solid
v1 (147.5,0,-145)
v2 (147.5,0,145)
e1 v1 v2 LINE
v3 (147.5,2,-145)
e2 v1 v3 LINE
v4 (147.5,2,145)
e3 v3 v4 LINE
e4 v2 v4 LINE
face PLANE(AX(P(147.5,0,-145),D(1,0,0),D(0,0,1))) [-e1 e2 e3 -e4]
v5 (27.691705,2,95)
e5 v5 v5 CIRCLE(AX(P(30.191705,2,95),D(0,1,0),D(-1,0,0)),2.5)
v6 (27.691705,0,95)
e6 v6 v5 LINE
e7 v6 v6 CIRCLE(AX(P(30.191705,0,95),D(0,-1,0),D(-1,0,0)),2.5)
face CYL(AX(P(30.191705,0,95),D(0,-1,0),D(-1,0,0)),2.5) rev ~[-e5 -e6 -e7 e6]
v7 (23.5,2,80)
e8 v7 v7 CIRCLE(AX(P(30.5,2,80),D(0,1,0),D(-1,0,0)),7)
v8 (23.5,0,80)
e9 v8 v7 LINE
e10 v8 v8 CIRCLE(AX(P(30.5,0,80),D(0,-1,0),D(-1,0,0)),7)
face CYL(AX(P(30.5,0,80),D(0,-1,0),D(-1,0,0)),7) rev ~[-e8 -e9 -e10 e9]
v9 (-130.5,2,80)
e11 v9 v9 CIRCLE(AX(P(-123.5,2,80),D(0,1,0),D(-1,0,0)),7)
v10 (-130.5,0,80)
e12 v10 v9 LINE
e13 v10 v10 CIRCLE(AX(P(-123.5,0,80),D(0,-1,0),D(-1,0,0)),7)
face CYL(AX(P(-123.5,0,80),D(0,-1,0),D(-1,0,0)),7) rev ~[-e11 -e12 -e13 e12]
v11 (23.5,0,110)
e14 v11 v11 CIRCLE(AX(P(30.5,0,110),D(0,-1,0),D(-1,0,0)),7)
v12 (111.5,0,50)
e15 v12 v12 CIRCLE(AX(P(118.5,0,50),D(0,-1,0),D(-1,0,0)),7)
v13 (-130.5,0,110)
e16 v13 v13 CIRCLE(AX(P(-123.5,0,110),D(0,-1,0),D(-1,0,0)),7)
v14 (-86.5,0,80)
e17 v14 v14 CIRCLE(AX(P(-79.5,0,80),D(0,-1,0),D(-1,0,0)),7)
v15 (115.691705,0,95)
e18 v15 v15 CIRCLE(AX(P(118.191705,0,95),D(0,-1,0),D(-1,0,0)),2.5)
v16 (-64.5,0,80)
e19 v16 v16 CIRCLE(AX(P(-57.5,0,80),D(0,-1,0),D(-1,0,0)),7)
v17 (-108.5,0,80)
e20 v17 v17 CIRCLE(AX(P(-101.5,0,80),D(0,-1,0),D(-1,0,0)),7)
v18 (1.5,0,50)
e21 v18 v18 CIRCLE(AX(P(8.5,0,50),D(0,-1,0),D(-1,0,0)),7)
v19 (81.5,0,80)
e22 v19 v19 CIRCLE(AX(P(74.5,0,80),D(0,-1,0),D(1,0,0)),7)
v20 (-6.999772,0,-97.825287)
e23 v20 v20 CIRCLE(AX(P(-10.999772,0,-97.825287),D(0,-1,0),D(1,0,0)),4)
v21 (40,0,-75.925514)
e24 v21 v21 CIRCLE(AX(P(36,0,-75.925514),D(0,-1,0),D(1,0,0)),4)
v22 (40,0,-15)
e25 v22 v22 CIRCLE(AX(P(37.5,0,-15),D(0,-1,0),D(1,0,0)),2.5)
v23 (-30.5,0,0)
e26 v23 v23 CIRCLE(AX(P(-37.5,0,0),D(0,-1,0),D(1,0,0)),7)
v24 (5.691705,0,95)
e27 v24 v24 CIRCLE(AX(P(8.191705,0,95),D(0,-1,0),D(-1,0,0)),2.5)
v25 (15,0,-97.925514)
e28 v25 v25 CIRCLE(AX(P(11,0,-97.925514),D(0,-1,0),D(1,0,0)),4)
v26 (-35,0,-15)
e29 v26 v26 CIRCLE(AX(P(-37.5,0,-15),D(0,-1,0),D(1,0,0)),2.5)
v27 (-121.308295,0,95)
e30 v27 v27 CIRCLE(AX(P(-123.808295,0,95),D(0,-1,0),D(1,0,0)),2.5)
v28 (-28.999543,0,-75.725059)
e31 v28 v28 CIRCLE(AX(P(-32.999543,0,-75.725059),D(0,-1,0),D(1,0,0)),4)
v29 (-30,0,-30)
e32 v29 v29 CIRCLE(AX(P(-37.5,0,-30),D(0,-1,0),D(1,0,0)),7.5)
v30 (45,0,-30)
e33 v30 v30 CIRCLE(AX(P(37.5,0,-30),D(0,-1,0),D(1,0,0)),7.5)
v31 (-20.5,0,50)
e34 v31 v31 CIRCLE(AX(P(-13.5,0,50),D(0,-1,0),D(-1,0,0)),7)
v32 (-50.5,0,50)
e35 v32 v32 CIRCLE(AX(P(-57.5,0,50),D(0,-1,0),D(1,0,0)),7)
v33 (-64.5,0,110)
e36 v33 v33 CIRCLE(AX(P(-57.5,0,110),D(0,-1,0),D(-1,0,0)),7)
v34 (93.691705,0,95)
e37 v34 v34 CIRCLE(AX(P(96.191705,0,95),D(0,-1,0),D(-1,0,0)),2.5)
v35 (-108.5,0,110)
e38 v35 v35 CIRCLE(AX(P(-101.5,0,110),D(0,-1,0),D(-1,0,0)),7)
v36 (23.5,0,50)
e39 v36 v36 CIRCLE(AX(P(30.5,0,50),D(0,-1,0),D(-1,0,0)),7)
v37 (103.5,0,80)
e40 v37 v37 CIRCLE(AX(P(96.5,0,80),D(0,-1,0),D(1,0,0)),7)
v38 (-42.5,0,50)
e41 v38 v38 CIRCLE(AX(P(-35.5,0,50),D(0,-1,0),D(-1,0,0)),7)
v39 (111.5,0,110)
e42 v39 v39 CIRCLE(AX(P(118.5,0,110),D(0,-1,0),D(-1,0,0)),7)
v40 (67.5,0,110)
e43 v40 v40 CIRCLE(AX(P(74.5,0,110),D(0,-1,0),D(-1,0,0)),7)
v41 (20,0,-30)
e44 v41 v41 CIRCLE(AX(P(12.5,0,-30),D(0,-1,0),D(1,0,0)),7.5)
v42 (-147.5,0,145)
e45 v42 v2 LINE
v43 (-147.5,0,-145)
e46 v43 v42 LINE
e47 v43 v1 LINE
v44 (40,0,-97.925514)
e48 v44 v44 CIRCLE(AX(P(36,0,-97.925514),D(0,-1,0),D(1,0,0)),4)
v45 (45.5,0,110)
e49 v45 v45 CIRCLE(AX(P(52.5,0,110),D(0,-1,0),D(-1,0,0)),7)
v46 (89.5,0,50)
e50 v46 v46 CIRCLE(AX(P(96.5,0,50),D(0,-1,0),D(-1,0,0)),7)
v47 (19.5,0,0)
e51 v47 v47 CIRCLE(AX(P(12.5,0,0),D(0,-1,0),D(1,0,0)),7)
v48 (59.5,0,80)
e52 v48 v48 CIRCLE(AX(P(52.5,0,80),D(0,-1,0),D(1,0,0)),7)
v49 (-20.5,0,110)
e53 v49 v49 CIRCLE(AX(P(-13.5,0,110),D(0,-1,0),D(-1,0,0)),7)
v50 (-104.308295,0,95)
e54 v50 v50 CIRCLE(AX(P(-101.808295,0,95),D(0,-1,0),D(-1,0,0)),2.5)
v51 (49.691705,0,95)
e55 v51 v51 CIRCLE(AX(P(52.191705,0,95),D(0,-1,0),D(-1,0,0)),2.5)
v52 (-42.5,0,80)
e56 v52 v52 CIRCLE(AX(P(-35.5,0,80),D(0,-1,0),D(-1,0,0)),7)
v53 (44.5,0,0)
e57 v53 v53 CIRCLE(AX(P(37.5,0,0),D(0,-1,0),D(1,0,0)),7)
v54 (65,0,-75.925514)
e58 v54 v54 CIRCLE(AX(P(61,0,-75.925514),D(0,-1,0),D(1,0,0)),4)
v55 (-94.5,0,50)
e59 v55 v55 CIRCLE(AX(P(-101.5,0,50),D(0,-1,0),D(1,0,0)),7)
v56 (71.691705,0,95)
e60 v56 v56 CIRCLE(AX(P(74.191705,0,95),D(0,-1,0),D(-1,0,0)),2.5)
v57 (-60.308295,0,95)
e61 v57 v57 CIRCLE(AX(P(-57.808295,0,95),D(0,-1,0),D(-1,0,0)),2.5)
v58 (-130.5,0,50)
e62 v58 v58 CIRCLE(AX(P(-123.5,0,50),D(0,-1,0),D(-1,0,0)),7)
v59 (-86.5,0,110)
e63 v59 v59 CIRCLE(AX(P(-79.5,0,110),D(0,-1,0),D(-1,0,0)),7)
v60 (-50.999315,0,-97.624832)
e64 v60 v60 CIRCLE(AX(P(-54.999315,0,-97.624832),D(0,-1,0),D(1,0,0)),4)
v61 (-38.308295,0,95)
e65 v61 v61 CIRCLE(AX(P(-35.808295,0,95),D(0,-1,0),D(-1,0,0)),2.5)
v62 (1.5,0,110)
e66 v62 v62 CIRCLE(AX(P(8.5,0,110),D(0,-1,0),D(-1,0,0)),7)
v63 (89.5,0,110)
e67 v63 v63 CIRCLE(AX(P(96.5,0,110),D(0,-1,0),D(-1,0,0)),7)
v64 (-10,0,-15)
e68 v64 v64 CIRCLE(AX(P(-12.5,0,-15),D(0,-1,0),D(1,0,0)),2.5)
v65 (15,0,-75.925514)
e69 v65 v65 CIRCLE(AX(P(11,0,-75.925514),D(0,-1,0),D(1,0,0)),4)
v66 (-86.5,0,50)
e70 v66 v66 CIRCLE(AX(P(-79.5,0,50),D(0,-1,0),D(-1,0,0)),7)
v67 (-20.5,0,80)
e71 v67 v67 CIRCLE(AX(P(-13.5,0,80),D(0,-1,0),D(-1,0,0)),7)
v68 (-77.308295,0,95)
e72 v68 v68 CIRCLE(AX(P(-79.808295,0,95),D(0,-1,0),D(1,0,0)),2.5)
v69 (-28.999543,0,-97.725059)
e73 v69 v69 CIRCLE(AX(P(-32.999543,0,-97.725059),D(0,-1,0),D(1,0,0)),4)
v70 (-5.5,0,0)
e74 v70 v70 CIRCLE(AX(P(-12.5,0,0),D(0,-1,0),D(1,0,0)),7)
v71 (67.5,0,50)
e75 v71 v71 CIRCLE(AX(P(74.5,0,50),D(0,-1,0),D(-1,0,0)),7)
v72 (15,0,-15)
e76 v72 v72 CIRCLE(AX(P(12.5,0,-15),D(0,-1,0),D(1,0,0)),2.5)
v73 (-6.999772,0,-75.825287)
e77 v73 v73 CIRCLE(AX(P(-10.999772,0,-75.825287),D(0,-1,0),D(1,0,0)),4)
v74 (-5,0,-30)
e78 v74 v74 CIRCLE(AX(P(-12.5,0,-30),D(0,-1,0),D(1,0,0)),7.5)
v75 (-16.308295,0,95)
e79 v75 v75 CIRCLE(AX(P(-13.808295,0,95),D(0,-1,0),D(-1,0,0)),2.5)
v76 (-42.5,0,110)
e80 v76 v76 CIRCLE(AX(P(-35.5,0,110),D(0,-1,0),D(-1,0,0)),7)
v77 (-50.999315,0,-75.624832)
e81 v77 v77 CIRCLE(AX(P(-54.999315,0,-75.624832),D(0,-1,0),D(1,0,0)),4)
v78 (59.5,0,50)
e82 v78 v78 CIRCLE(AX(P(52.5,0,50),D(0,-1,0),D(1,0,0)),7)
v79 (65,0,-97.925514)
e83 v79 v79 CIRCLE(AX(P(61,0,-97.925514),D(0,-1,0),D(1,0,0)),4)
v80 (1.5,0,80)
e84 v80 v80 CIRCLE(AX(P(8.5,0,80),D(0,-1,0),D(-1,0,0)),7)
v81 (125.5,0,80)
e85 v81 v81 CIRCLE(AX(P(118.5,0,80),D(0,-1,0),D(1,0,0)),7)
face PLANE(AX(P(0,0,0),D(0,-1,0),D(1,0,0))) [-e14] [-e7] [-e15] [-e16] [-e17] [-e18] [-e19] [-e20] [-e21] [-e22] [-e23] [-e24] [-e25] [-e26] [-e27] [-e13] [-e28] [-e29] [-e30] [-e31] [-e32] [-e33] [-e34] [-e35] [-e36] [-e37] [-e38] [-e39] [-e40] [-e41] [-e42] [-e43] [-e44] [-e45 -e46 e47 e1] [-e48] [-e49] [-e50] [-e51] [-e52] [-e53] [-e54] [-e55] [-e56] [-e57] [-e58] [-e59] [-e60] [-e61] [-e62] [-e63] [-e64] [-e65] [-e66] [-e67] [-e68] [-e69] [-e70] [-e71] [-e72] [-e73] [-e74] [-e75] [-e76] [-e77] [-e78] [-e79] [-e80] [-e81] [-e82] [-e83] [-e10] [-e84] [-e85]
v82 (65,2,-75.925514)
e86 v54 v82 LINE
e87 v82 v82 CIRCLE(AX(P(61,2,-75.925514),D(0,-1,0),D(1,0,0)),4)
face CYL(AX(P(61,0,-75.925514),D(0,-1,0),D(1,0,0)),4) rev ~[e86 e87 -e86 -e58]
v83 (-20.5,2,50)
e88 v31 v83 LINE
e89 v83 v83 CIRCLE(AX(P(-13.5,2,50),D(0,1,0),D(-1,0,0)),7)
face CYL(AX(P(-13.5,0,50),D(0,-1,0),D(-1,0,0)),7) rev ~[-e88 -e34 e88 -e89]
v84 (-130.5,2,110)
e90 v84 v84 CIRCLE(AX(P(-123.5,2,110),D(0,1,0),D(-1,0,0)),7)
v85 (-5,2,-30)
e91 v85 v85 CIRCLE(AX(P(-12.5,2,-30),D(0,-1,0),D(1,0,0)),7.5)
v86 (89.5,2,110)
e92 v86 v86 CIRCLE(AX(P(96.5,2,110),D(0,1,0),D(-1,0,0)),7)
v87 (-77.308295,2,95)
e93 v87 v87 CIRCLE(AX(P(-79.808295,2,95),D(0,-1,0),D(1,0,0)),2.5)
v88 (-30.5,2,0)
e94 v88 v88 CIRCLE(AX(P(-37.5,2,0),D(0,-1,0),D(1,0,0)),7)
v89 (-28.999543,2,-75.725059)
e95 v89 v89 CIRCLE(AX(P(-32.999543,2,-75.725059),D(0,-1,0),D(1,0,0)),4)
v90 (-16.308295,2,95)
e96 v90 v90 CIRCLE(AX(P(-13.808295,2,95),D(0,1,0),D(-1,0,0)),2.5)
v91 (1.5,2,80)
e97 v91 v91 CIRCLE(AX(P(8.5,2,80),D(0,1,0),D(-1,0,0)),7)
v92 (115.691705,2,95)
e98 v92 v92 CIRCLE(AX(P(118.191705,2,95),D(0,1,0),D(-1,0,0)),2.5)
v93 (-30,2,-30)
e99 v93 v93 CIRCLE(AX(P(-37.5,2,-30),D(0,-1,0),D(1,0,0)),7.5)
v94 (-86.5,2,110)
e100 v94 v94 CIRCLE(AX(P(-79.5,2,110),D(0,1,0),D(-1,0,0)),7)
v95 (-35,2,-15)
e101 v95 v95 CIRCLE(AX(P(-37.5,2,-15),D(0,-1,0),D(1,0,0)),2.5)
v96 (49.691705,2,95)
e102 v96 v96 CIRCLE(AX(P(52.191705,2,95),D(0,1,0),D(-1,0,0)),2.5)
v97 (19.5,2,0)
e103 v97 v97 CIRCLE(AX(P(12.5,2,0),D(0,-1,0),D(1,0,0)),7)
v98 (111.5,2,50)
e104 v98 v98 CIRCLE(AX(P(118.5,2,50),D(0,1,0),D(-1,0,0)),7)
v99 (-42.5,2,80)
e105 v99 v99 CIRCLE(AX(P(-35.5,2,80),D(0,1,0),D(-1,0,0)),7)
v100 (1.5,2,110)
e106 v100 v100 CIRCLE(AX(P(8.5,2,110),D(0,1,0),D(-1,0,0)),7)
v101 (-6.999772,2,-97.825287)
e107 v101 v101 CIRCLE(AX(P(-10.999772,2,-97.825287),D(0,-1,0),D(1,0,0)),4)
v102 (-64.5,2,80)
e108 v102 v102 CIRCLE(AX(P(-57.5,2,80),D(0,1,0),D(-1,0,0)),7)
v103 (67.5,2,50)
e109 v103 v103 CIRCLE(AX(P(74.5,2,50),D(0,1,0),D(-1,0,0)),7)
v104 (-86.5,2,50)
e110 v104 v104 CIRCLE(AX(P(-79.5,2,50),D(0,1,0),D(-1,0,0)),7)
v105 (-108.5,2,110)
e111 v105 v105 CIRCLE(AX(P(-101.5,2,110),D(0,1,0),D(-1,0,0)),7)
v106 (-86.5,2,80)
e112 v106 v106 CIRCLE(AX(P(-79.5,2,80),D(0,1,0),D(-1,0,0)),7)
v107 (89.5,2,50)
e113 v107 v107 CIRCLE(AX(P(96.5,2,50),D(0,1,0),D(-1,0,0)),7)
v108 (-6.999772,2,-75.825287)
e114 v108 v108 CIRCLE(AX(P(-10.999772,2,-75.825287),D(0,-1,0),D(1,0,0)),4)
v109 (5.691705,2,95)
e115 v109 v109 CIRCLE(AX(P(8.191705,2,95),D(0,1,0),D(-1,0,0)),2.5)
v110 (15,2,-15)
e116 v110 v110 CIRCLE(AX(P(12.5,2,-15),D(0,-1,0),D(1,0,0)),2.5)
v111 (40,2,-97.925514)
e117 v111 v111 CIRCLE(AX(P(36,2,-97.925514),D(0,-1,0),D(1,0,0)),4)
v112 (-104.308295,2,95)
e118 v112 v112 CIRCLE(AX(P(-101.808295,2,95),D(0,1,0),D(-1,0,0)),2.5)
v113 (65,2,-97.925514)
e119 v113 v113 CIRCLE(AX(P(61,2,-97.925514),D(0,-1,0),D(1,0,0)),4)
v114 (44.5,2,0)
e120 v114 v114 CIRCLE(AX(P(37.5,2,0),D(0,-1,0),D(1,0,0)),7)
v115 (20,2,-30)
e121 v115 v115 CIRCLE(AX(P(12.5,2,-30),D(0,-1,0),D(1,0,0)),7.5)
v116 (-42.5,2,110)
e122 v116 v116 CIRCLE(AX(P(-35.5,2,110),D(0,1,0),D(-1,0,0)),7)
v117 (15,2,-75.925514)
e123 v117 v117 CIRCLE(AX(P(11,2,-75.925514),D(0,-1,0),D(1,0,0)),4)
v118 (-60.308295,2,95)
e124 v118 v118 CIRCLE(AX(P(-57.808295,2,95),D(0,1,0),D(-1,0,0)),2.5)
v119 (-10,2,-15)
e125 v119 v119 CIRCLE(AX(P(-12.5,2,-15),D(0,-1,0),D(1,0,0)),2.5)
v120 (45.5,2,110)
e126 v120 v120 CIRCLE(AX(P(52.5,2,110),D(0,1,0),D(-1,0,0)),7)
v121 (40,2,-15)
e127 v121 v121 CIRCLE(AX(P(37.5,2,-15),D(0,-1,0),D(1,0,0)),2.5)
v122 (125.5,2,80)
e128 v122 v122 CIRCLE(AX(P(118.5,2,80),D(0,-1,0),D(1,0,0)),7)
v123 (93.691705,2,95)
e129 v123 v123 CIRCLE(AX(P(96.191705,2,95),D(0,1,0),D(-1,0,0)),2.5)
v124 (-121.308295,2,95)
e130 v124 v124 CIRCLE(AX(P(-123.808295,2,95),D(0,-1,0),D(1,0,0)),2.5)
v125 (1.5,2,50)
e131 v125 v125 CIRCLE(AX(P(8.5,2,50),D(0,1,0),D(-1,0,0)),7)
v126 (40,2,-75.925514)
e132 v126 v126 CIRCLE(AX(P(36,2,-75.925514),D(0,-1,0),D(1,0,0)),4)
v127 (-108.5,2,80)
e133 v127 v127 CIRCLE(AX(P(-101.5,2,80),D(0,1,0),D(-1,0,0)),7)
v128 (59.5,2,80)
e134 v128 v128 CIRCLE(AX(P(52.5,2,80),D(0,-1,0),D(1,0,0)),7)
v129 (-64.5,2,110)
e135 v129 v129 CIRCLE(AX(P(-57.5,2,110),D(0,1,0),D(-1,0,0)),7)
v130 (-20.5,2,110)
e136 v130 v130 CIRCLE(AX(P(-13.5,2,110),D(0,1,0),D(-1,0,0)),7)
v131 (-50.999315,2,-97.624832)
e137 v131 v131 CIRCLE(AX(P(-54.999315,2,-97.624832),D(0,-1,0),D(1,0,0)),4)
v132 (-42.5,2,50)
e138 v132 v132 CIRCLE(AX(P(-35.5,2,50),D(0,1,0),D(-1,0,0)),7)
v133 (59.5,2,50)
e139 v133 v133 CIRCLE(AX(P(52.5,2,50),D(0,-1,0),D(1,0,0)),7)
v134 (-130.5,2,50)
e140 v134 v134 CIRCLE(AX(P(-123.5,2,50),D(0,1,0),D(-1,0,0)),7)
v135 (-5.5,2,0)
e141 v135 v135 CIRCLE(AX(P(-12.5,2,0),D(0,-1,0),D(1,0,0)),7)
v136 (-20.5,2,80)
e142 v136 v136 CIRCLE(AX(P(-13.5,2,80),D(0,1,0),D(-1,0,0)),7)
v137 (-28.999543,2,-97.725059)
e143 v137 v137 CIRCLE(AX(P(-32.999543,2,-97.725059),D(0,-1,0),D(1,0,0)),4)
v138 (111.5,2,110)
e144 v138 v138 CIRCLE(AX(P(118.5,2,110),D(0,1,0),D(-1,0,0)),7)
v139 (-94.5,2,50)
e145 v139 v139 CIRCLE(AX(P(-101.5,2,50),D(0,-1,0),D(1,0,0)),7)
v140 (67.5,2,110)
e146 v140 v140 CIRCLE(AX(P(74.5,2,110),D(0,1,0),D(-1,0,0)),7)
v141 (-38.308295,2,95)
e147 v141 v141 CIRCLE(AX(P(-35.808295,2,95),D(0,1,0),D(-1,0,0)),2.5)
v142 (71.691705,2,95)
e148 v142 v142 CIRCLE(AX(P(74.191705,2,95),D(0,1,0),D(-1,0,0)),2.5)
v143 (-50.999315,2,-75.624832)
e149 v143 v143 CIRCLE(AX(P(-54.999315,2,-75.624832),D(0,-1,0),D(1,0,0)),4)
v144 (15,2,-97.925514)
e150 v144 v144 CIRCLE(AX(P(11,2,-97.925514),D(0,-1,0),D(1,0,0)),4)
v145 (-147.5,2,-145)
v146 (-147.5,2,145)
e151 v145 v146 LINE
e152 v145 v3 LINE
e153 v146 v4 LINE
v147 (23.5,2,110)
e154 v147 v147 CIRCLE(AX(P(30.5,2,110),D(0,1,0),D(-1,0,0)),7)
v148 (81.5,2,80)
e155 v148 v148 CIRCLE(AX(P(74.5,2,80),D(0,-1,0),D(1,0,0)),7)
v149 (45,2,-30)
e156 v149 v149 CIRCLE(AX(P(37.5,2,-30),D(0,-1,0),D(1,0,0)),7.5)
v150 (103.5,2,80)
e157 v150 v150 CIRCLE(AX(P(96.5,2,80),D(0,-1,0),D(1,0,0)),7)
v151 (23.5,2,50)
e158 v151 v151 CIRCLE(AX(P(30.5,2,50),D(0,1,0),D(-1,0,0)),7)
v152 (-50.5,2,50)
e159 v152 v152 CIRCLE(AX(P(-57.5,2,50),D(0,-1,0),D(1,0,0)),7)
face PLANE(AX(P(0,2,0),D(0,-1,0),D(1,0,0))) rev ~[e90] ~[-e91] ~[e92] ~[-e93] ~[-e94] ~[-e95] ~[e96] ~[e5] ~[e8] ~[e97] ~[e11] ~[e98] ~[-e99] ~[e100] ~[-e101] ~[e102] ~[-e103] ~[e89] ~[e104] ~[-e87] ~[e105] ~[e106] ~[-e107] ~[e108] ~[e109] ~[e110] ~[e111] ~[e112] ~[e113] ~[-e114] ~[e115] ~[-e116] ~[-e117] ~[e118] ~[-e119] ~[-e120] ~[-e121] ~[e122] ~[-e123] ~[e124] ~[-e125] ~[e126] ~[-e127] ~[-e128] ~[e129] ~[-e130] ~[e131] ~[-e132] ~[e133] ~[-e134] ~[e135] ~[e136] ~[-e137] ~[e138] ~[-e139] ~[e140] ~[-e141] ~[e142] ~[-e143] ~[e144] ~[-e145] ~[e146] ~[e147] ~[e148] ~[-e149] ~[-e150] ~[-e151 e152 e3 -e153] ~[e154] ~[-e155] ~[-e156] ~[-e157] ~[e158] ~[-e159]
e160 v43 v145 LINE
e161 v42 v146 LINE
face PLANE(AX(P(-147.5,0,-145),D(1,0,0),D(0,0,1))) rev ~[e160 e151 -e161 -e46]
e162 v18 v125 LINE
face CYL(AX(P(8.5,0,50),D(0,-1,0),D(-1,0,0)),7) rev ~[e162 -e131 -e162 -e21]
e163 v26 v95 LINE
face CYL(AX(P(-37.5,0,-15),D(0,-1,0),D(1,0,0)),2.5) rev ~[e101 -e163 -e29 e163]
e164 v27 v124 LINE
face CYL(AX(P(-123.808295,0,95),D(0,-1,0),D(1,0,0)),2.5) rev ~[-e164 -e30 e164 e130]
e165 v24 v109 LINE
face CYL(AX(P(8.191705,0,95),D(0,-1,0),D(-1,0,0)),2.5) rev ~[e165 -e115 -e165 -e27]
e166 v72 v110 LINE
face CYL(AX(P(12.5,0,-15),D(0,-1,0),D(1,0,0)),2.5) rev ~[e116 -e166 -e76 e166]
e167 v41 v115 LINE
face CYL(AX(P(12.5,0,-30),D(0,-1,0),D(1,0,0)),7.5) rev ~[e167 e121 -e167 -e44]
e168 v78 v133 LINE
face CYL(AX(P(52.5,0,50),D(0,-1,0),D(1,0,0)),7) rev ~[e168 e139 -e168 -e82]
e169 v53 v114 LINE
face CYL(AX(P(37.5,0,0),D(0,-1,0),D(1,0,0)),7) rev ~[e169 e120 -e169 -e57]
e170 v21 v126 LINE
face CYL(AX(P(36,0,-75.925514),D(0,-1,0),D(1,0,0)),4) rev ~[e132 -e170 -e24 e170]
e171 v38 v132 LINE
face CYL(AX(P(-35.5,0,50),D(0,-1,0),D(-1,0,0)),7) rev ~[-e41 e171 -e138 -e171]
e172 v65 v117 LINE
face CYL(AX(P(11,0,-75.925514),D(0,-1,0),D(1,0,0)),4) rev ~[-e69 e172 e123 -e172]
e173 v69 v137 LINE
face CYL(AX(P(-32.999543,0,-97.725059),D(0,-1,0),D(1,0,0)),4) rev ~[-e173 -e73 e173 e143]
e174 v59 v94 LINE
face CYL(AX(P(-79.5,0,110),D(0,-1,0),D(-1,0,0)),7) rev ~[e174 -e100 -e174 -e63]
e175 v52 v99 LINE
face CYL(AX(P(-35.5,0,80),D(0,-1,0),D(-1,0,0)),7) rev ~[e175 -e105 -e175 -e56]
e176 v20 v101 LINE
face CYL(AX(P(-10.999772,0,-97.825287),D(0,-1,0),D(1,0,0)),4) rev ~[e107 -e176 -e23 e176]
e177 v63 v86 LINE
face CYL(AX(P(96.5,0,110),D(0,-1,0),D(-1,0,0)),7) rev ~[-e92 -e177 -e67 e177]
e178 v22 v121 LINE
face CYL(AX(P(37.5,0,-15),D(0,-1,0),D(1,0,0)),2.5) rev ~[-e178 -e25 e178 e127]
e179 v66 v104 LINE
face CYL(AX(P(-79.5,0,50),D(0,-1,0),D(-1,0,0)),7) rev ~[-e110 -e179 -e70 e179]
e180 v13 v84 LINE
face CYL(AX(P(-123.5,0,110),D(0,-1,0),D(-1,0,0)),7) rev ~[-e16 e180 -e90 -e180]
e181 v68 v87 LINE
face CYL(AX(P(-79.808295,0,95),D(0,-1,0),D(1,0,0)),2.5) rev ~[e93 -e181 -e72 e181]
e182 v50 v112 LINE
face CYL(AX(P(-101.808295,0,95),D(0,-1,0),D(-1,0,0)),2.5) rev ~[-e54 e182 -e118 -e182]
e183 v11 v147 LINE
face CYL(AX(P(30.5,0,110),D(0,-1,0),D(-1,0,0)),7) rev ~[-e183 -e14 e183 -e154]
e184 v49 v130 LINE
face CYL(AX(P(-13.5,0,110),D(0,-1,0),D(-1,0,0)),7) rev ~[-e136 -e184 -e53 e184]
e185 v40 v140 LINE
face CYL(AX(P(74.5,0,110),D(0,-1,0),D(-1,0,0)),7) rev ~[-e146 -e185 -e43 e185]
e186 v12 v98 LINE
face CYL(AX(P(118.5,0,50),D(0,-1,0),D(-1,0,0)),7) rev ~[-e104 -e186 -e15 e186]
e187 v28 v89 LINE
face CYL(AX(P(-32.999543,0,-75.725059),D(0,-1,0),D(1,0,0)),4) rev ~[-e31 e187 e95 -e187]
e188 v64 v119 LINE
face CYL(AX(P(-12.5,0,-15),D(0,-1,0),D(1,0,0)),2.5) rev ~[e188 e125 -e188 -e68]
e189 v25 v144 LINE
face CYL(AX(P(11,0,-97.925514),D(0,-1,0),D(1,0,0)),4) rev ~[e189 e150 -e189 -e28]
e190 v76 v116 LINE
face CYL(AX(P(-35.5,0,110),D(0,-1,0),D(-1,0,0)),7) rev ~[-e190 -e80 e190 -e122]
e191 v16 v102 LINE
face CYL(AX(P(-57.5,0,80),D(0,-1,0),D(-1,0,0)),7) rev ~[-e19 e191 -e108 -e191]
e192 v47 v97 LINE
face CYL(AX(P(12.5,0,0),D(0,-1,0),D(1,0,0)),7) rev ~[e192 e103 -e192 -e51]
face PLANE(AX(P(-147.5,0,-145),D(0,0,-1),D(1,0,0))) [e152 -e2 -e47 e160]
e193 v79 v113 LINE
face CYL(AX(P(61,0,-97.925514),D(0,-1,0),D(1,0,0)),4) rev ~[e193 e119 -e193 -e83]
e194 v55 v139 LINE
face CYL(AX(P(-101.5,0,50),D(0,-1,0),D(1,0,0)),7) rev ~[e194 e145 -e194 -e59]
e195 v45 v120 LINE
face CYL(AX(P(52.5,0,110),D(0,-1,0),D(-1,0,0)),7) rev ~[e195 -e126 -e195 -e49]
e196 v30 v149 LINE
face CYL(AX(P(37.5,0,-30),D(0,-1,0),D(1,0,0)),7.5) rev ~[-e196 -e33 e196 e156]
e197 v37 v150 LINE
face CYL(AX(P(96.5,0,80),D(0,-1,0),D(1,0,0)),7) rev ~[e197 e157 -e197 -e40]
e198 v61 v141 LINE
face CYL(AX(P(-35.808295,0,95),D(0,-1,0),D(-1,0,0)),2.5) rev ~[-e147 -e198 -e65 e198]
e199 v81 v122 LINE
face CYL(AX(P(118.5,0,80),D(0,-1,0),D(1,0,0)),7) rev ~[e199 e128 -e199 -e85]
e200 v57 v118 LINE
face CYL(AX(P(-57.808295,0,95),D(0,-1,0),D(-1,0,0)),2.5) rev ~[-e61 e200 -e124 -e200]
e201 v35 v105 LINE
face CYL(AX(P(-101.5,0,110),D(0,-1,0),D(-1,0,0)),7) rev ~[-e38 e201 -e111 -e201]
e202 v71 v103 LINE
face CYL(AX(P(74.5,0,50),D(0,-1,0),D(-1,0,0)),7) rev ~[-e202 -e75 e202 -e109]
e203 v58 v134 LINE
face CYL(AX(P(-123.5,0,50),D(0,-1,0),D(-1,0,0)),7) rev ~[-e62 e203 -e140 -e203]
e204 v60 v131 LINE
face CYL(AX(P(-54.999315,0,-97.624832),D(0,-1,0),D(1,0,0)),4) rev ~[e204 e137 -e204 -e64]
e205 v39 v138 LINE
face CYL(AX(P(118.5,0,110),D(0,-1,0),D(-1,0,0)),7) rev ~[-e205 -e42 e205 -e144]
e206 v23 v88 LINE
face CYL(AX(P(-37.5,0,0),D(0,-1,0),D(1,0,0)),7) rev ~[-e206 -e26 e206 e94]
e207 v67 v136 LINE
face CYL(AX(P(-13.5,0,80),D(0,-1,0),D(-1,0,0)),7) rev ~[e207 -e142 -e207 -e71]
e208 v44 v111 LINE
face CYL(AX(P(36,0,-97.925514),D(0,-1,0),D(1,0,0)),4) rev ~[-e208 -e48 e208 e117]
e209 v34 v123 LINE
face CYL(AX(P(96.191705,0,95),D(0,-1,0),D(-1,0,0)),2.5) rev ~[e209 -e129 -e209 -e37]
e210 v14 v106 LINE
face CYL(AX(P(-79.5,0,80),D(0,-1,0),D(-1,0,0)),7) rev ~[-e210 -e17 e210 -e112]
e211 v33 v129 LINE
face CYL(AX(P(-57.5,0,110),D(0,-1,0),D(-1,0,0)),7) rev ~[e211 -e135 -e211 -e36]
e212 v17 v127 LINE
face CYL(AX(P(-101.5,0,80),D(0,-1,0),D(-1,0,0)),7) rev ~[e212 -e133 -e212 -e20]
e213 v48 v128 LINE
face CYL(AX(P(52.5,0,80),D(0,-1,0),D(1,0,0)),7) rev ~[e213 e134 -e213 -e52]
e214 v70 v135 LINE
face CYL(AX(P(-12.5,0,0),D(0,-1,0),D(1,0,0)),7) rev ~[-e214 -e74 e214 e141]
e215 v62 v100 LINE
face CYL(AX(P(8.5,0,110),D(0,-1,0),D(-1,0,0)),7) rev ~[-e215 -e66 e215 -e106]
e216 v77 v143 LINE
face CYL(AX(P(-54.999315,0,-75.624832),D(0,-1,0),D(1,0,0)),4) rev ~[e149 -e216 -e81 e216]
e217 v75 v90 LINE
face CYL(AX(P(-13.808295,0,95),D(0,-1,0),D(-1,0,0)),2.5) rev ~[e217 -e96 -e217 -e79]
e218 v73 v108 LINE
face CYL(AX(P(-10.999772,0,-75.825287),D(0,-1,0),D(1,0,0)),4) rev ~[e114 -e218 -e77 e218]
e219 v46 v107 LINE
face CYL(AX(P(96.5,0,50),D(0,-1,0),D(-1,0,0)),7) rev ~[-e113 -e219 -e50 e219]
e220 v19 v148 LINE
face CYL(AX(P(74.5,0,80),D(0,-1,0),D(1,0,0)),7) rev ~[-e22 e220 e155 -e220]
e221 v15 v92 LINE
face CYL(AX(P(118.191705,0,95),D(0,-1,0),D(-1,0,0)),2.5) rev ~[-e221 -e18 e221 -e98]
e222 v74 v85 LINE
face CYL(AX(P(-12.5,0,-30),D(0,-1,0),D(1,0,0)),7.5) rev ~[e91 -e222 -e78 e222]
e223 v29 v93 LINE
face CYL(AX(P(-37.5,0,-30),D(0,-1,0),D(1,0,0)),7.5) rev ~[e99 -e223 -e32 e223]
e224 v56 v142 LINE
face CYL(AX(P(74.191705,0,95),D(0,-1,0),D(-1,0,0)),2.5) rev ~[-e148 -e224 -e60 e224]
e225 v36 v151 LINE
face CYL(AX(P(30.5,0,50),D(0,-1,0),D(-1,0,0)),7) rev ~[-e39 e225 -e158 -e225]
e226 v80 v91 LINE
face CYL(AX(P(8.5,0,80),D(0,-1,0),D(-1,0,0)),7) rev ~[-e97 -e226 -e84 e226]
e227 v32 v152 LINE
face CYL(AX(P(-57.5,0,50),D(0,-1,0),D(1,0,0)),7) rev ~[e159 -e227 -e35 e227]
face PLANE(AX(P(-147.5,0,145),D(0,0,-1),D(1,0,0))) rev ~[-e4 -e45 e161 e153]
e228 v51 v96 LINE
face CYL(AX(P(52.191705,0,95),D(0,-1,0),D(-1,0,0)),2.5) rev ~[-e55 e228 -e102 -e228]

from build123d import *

# Parameters (mm, degrees)
F0_W      = 295
F0_H      = 290
F1_DEPTH  = 2
F3_DEPTH  = 25
F4_DEPTH  = 25
F6_DEPTH  = 25
F8_DEPTH  = 25
F9_R      = 7.5
F9_R_2    = 7
F9_R_3    = 2.5
F10_DEPTH = 25
F11_W     = 295
F11_H     = 290
F11_R     = 4
F11_R_2   = 7.5
F11_R_3   = 2.5
F11_R_4   = 7
F12_DEPTH = 2


# Not quite as in the source:
# - a feature names something its author has since deleted; it is built from what else it names


with BuildPart() as f1:
    # F0 (on Front) → F1 (new body)
    with BuildSketch(Plane.XZ):
        Rectangle(F0_W, F0_H)
    extrude(amount=-F1_DEPTH)

    # F2 (on face) → F3 (cut)
    with BuildSketch(Plane.XZ):
        with BuildLine():
            ThreePointArc((-116.5, 110), (-123.5, 117), (-130.5, 110))
            Line((-130.5, 110), (-116.5, 110))
        make_face()
        with BuildLine():
            Line((-116.5, 110), (-130.5, 110))
            ThreePointArc((-130.5, 110), (-123.5, 103), (-116.5, 110))
        make_face()
    extrude(amount=-F3_DEPTH, mode=Mode.SUBTRACT)

    # F2 (on face) → F4 (cut)
    with BuildSketch(Plane.XZ):
        with BuildLine():
            ThreePointArc((-116.5, 110), (-123.5, 117), (-130.5, 110))
            Line((-130.5, 110), (-116.5, 110))
        make_face()
        with BuildLine():
            ThreePointArc((125.5, 110), (118.5, 117), (111.5, 110))
            Line((111.5, 110), (125.5, 110))
        make_face()
        with BuildLine():
            Line((125.5, 110), (111.5, 110))
            ThreePointArc((111.5, 110), (118.5, 103), (125.5, 110))
        make_face()
        with BuildLine():
            ThreePointArc((103.5, 110), (96.5, 117), (89.5, 110))
            Line((89.5, 110), (103.5, 110))
        make_face()
        with BuildLine():
            Line((103.5, 110), (89.5, 110))
            ThreePointArc((89.5, 110), (96.5, 103), (103.5, 110))
        make_face()
        with BuildLine():
            ThreePointArc((81.5, 110), (74.5, 117), (67.5, 110))
            Line((67.5, 110), (81.5, 110))
        make_face()
        with BuildLine():
            Line((81.5, 110), (67.5, 110))
            ThreePointArc((67.5, 110), (74.5, 103), (81.5, 110))
        make_face()
        with BuildLine():
            ThreePointArc((59.5, 110), (52.5, 117), (45.5, 110))
            Line((45.5, 110), (59.5, 110))
        make_face()
        with BuildLine():
            Line((59.5, 110), (45.5, 110))
            ThreePointArc((45.5, 110), (52.5, 103), (59.5, 110))
        make_face()
        with BuildLine():
            ThreePointArc((37.5, 110), (30.5, 117), (23.5, 110))
            Line((23.5, 110), (37.5, 110))
        make_face()
        with BuildLine():
            Line((37.5, 110), (23.5, 110))
            ThreePointArc((23.5, 110), (30.5, 103), (37.5, 110))
        make_face()
        with BuildLine():
            ThreePointArc((15.5, 110), (8.5, 117), (1.5, 110))
            Line((1.5, 110), (15.5, 110))
        make_face()
        with BuildLine():
            Line((15.5, 110), (1.5, 110))
            ThreePointArc((1.5, 110), (8.5, 103), (15.5, 110))
        make_face()
        with BuildLine():
            ThreePointArc((-6.5, 110), (-13.5, 117), (-20.5, 110))
            Line((-20.5, 110), (-6.5, 110))
        make_face()
        with BuildLine():
            Line((-6.5, 110), (-20.5, 110))
            ThreePointArc((-20.5, 110), (-13.5, 103), (-6.5, 110))
        make_face()
        with BuildLine():
            ThreePointArc((-28.5, 110), (-35.5, 117), (-42.5, 110))
            Line((-42.5, 110), (-28.5, 110))
        make_face()
        with BuildLine():
            Line((-28.5, 110), (-42.5, 110))
            ThreePointArc((-42.5, 110), (-35.5, 103), (-28.5, 110))
        make_face()
        with BuildLine():
            ThreePointArc((-50.5, 110), (-57.5, 117), (-64.5, 110))
            Line((-64.5, 110), (-50.5, 110))
        make_face()
        with BuildLine():
            Line((-50.5, 110), (-64.5, 110))
            ThreePointArc((-64.5, 110), (-57.5, 103), (-50.5, 110))
        make_face()
        with BuildLine():
            ThreePointArc((-72.5, 110), (-79.5, 117), (-86.5, 110))
            Line((-86.5, 110), (-72.5, 110))
        make_face()
        with BuildLine():
            Line((-72.5, 110), (-86.5, 110))
            ThreePointArc((-86.5, 110), (-79.5, 103), (-72.5, 110))
        make_face()
        with BuildLine():
            ThreePointArc((-94.5, 110), (-101.5, 117), (-108.5, 110))
            Line((-108.5, 110), (-94.5, 110))
        make_face()
        with BuildLine():
            Line((-94.5, 110), (-108.5, 110))
            ThreePointArc((-108.5, 110), (-101.5, 103), (-94.5, 110))
        make_face()
        with BuildLine():
            Line((-116.5, 110), (-130.5, 110))
            ThreePointArc((-130.5, 110), (-123.5, 103), (-116.5, 110))
        make_face()
    extrude(amount=-F4_DEPTH, mode=Mode.SUBTRACT)

    # F5 (on face) → F6 (cut)
    with BuildSketch(Plane.XZ):
        with BuildLine():
            ThreePointArc((-116.5, 80), (-123.5, 87), (-130.5, 80))
            Line((-130.5, 80), (-116.5, 80))
        make_face()
        with BuildLine():
            Line((-116.5, 80), (-130.5, 80))
            ThreePointArc((-130.5, 80), (-123.5, 73), (-116.5, 80))
        make_face()
        with BuildLine():
            ThreePointArc((-116.5, 50), (-123.5, 57), (-130.5, 50))
            Line((-130.5, 50), (-116.5, 50))
        make_face()
        with BuildLine():
            Line((-116.5, 50), (-130.5, 50))
            ThreePointArc((-130.5, 50), (-123.5, 43), (-116.5, 50))
        make_face()
        with BuildLine():
            ThreePointArc((-94.5, 80), (-101.5, 87), (-108.5, 80))
            Line((-108.5, 80), (-94.5, 80))
        make_face()
        with BuildLine():
            Line((-94.5, 80), (-108.5, 80))
            ThreePointArc((-108.5, 80), (-101.5, 73), (-94.5, 80))
        make_face()
        with BuildLine():
            ThreePointArc((-72.5, 80), (-79.5, 87), (-86.5, 80))
            Line((-86.5, 80), (-72.5, 80))
        make_face()
        with BuildLine():
            Line((-72.5, 80), (-86.5, 80))
            ThreePointArc((-86.5, 80), (-79.5, 73), (-72.5, 80))
        make_face()
        with BuildLine():
            ThreePointArc((-50.5, 80), (-57.5, 87), (-64.5, 80))
            Line((-64.5, 80), (-50.5, 80))
        make_face()
        with BuildLine():
            Line((-50.5, 80), (-64.5, 80))
            ThreePointArc((-64.5, 80), (-57.5, 73), (-50.5, 80))
        make_face()
        with BuildLine():
            Line((-42.5, 80), (-28.5, 80))
            ThreePointArc((-28.5, 80), (-35.5, 87), (-42.5, 80))
        make_face()
        with BuildLine():
            ThreePointArc((-42.5, 80), (-35.5, 73), (-28.5, 80))
            Line((-28.5, 80), (-42.5, 80))
        make_face()
        with BuildLine():
            Line((-20.5, 80), (-6.5, 80))
            ThreePointArc((-6.5, 80), (-13.5, 87), (-20.5, 80))
        make_face()
        with BuildLine():
            ThreePointArc((-20.5, 80), (-13.5, 73), (-6.5, 80))
            Line((-6.5, 80), (-20.5, 80))
        make_face()
        with BuildLine():
            Line((1.5, 80), (15.5, 80))
            ThreePointArc((15.5, 80), (8.5, 87), (1.5, 80))
        make_face()
        with BuildLine():
            ThreePointArc((1.5, 80), (8.5, 73), (15.5, 80))
            Line((15.5, 80), (1.5, 80))
        make_face()
        with BuildLine():
            Line((23.5, 80), (37.5, 80))
            ThreePointArc((37.5, 80), (30.5, 87), (23.5, 80))
        make_face()
        with BuildLine():
            ThreePointArc((23.5, 80), (30.5, 73), (37.5, 80))
            Line((37.5, 80), (23.5, 80))
        make_face()
        with BuildLine():
            ThreePointArc((45.5, 80), (52.5, 73), (59.5, 80))
            Line((59.5, 80), (45.5, 80))
        make_face()
        with BuildLine():
            ThreePointArc((67.5, 80), (74.5, 73), (81.5, 80))
            Line((81.5, 80), (67.5, 80))
        make_face()
        with BuildLine():
            ThreePointArc((89.5, 80), (96.5, 73), (103.5, 80))
            Line((103.5, 80), (89.5, 80))
        make_face()
        with BuildLine():
            ThreePointArc((111.5, 80), (118.5, 73), (125.5, 80))
            Line((125.5, 80), (111.5, 80))
        make_face()
        with BuildLine():
            Line((111.5, 80), (125.5, 80))
            ThreePointArc((125.5, 80), (118.5, 87), (111.5, 80))
        make_face()
        with BuildLine():
            Line((89.5, 80), (103.5, 80))
            ThreePointArc((103.5, 80), (96.5, 87), (89.5, 80))
        make_face()
        with BuildLine():
            Line((67.5, 80), (81.5, 80))
            ThreePointArc((81.5, 80), (74.5, 87), (67.5, 80))
        make_face()
        with BuildLine():
            Line((45.5, 80), (59.5, 80))
            ThreePointArc((59.5, 80), (52.5, 87), (45.5, 80))
        make_face()
        with BuildLine():
            Line((111.5, 50), (125.5, 50))
            ThreePointArc((125.5, 50), (118.5, 57), (111.5, 50))
        make_face()
        with BuildLine():
            Line((89.5, 50), (103.5, 50))
            ThreePointArc((103.5, 50), (96.5, 57), (89.5, 50))
        make_face()
        with BuildLine():
            ThreePointArc((89.5, 50), (96.5, 43), (103.5, 50))
            Line((103.5, 50), (89.5, 50))
        make_face()
        with BuildLine():
            ThreePointArc((111.5, 50), (118.5, 43), (125.5, 50))
            Line((125.5, 50), (111.5, 50))
        make_face()
        with BuildLine():
            Line((67.5, 50), (81.5, 50))
            ThreePointArc((81.5, 50), (74.5, 57), (67.5, 50))
        make_face()
        with BuildLine():
            ThreePointArc((67.5, 50), (74.5, 43), (81.5, 50))
            Line((81.5, 50), (67.5, 50))
        make_face()
        with BuildLine():
            ThreePointArc((45.5, 50), (52.5, 43), (59.5, 50))
            Line((59.5, 50), (45.5, 50))
        make_face()
        with BuildLine():
            Line((45.5, 50), (59.5, 50))
            ThreePointArc((59.5, 50), (52.5, 57), (45.5, 50))
        make_face()
        with BuildLine():
            Line((23.5, 50), (37.5, 50))
            ThreePointArc((37.5, 50), (30.5, 57), (23.5, 50))
        make_face()
        with BuildLine():
            ThreePointArc((23.5, 50), (30.5, 43), (37.5, 50))
            Line((37.5, 50), (23.5, 50))
        make_face()
        with BuildLine():
            Line((1.5, 50), (15.5, 50))
            ThreePointArc((15.5, 50), (8.5, 57), (1.5, 50))
        make_face()
        with BuildLine():
            ThreePointArc((1.5, 50), (8.5, 43), (15.5, 50))
            Line((15.5, 50), (1.5, 50))
        make_face()
        with BuildLine():
            Line((-20.5, 50), (-6.5, 50))
            ThreePointArc((-6.5, 50), (-13.5, 57), (-20.5, 50))
        make_face()
        with BuildLine():
            ThreePointArc((-20.5, 50), (-13.5, 43), (-6.5, 50))
            Line((-6.5, 50), (-20.5, 50))
        make_face()
        with BuildLine():
            ThreePointArc((-28.5, 50), (-35.5, 57), (-42.5, 50))
            Line((-42.5, 50), (-28.5, 50))
        make_face()
        with BuildLine():
            Line((-28.5, 50), (-42.5, 50))
            ThreePointArc((-42.5, 50), (-35.5, 43), (-28.5, 50))
        make_face()
        with BuildLine():
            Line((-50.5, 50), (-64.5, 50))
            ThreePointArc((-64.5, 50), (-57.5, 43), (-50.5, 50))
        make_face()
        with BuildLine():
            ThreePointArc((-72.5, 50), (-79.5, 57), (-86.5, 50))
            Line((-86.5, 50), (-72.5, 50))
        make_face()
        with BuildLine():
            Line((-72.5, 50), (-86.5, 50))
            ThreePointArc((-86.5, 50), (-79.5, 43), (-72.5, 50))
        make_face()
        with BuildLine():
            Line((-94.5, 50), (-108.5, 50))
            ThreePointArc((-108.5, 50), (-101.5, 43), (-94.5, 50))
        make_face()
        with BuildLine():
            ThreePointArc((-50.5, 50), (-57.5, 57), (-64.5, 50))
            Line((-64.5, 50), (-50.5, 50))
        make_face()
        with BuildLine():
            ThreePointArc((-94.5, 50), (-101.5, 57), (-108.5, 50))
            Line((-108.5, 50), (-94.5, 50))
        make_face()
    extrude(amount=-F6_DEPTH, mode=Mode.SUBTRACT)

    # F7 (on face) → F8 (cut)
    with BuildSketch(Plane.XZ):
        with BuildLine():
            ThreePointArc((-126.3082945347, 95), (-123.8082945347, 92.5), (-121.3082945347, 95))
            Line((-121.3082945347, 95), (-126.3082945347, 95))
        make_face()
        with BuildLine():
            Line((-126.3082945347, 95), (-121.3082945347, 95))
            ThreePointArc((-121.3082945347, 95), (-123.8082945347, 97.5), (-126.3082945347, 95))
        make_face()
        with BuildLine():
            ThreePointArc((-99.3082945347, 95), (-101.8082945347, 97.5), (-104.3082945347, 95))
            Line((-104.3082945347, 95), (-99.3082945347, 95))
        make_face()
        with BuildLine():
            Line((-99.3082945347, 95), (-104.3082945347, 95))
            ThreePointArc((-104.3082945347, 95), (-101.8082945347, 92.5), (-99.3082945347, 95))
        make_face()
        with BuildLine():
            Line((-77.3082945347, 95), (-82.3082945347, 95))
            ThreePointArc((-82.3082945347, 95), (-79.8082945347, 92.5), (-77.3082945347, 95))
        make_face()
        with BuildLine():
            ThreePointArc((-77.3082945347, 95), (-79.8082945347, 97.5), (-82.3082945347, 95))
            Line((-82.3082945347, 95), (-77.3082945347, 95))
        make_face()
        with BuildLine():
            ThreePointArc((-55.3082945347, 95), (-57.8082945347, 97.5), (-60.3082945347, 95))
            Line((-60.3082945347, 95), (-55.3082945347, 95))
        make_face()
        with BuildLine():
            Line((-55.3082945347, 95), (-60.3082945347, 95))
            ThreePointArc((-60.3082945347, 95), (-57.8082945347, 92.5), (-55.3082945347, 95))
        make_face()
        with BuildLine():
            ThreePointArc((-33.3082945347, 95), (-35.8082945347, 97.5), (-38.3082945347, 95))
            Line((-38.3082945347, 95), (-33.3082945347, 95))
        make_face()
        with BuildLine():
            Line((-33.3082945347, 95), (-38.3082945347, 95))
            ThreePointArc((-38.3082945347, 95), (-35.8082945347, 92.5), (-33.3082945347, 95))
        make_face()
        with BuildLine():
            ThreePointArc((-11.3082945347, 95), (-13.8082945347, 97.5), (-16.3082945347, 95))
            Line((-16.3082945347, 95), (-11.3082945347, 95))
        make_face()
        with BuildLine():
            Line((-11.3082945347, 95), (-16.3082945347, 95))
            ThreePointArc((-16.3082945347, 95), (-13.8082945347, 92.5), (-11.3082945347, 95))
        make_face()
        with BuildLine():
            ThreePointArc((10.6917054653, 95), (8.1917054653, 97.5), (5.6917054653, 95))
            Line((5.6917054653, 95), (10.6917054653, 95))
        make_face()
        with BuildLine():
            Line((10.6917054653, 95), (5.6917054653, 95))
            ThreePointArc((5.6917054653, 95), (8.1917054653, 92.5), (10.6917054653, 95))
        make_face()
        with BuildLine():
            ThreePointArc((32.6917054653, 95), (30.1917054653, 97.5), (27.6917054653, 95))
            Line((27.6917054653, 95), (32.6917054653, 95))
        make_face()
        with BuildLine():
            Line((32.6917054653, 95), (27.6917054653, 95))
            ThreePointArc((27.6917054653, 95), (30.1917054653, 92.5), (32.6917054653, 95))
        make_face()
        with BuildLine():
            Line((49.6917054653, 95), (54.6917054653, 95))
            ThreePointArc((54.6917054653, 95), (52.1917054653, 97.5), (49.6917054653, 95))
        make_face()
        with BuildLine():
            ThreePointArc((49.6917054653, 95), (52.1917054653, 92.5), (54.6917054653, 95))
            Line((54.6917054653, 95), (49.6917054653, 95))
        make_face()
        with BuildLine():
            Line((71.6917054653, 95), (76.6917054653, 95))
            ThreePointArc((76.6917054653, 95), (74.1917054653, 97.5), (71.6917054653, 95))
        make_face()
        with BuildLine():
            ThreePointArc((71.6917054653, 95), (74.1917054653, 92.5), (76.6917054653, 95))
            Line((76.6917054653, 95), (71.6917054653, 95))
        make_face()
        with BuildLine():
            Line((93.6917054653, 95), (98.6917054653, 95))
            ThreePointArc((98.6917054653, 95), (96.1917054653, 97.5), (93.6917054653, 95))
        make_face()
        with BuildLine():
            ThreePointArc((93.6917054653, 95), (96.1917054653, 92.5), (98.6917054653, 95))
            Line((98.6917054653, 95), (93.6917054653, 95))
        make_face()
        with BuildLine():
            Line((115.6917054653, 95), (120.6917054653, 95))
            ThreePointArc((120.6917054653, 95), (118.1917054653, 97.5), (115.6917054653, 95))
        make_face()
        with BuildLine():
            ThreePointArc((115.6917054653, 95), (118.1917054653, 92.5), (120.6917054653, 95))
            Line((120.6917054653, 95), (115.6917054653, 95))
        make_face()
    extrude(amount=-F8_DEPTH, mode=Mode.SUBTRACT)

    # F9 (on face) → F10 (cut)
    with BuildSketch(Plane.XZ):
        with Locations((-37.5, -30)):
            Circle(F9_R)
        with Locations((-37.5, 0)):
            Circle(F9_R_2)
        with Locations((12.5, 0)):
            Circle(F9_R_2)
        with Locations((37.5, -30)):
            Circle(F9_R)
        with Locations((37.5, 0)):
            Circle(F9_R_2)
        with Locations((12.5, -30)):
            Circle(F9_R)
        with Locations((-12.5, -30)):
            Circle(F9_R)
        with Locations((12.5, -15)):
            Circle(F9_R_3)
        with Locations((-12.5, -15)):
            Circle(F9_R_3)
        with Locations((-37.5, -15)):
            Circle(F9_R_3)
        with Locations((37.5, -15)):
            Circle(F9_R_3)
        with Locations((-12.5, 0)):
            Circle(F9_R_2)
    extrude(amount=-F10_DEPTH, mode=Mode.SUBTRACT)

    # F11 (on face) → F12 (intersect)
    with BuildSketch(Plane.XZ):
        Rectangle(F11_W, F11_H)
        with Locations((-54.9993150739, -97.6248317928)):
            Circle(F11_R, mode=Mode.SUBTRACT)
        with Locations((-54.9993150739, -75.6248317928)):
            Circle(F11_R, mode=Mode.SUBTRACT)
        with Locations((-32.9995433826, -97.7250591895)):
            Circle(F11_R, mode=Mode.SUBTRACT)
        with Locations((-10.9997716913, -97.8252865861)):
            Circle(F11_R, mode=Mode.SUBTRACT)
        with Locations((-32.9995433826, -75.7250591895)):
            Circle(F11_R, mode=Mode.SUBTRACT)
        with Locations((-10.9997716913, -75.8252865861)):
            Circle(F11_R, mode=Mode.SUBTRACT)
        with Locations((-37.5, -30)):
            Circle(F11_R_2, mode=Mode.SUBTRACT)
        with Locations((-37.5, -15)):
            Circle(F11_R_3, mode=Mode.SUBTRACT)
        with Locations((-12.5, -30)):
            Circle(F11_R_2, mode=Mode.SUBTRACT)
        with Locations((-12.5, -15)):
            Circle(F11_R_3, mode=Mode.SUBTRACT)
        with Locations((11, -97.9255139828)):
            Circle(F11_R, mode=Mode.SUBTRACT)
        with Locations((36, -97.9255139828)):
            Circle(F11_R, mode=Mode.SUBTRACT)
        with Locations((11, -75.9255139828)):
            Circle(F11_R, mode=Mode.SUBTRACT)
        with Locations((36, -75.9255139828)):
            Circle(F11_R, mode=Mode.SUBTRACT)
        with Locations((61, -97.9255139828)):
            Circle(F11_R, mode=Mode.SUBTRACT)
        with Locations((61, -75.9255139828)):
            Circle(F11_R, mode=Mode.SUBTRACT)
        with Locations((12.5, -30)):
            Circle(F11_R_2, mode=Mode.SUBTRACT)
        with Locations((12.5, -15)):
            Circle(F11_R_3, mode=Mode.SUBTRACT)
        with Locations((37.5, -30)):
            Circle(F11_R_2, mode=Mode.SUBTRACT)
        with Locations((37.5, -15)):
            Circle(F11_R_3, mode=Mode.SUBTRACT)
        with Locations((-123.5, 50)):
            Circle(F11_R_4, mode=Mode.SUBTRACT)
        with Locations((-101.5, 50)):
            Circle(F11_R_4, mode=Mode.SUBTRACT)
        with Locations((-79.5, 50)):
            Circle(F11_R_4, mode=Mode.SUBTRACT)
        with Locations((-37.5, 0)):
            Circle(F11_R_4, mode=Mode.SUBTRACT)
        with Locations((-12.5, 0)):
            Circle(F11_R_4, mode=Mode.SUBTRACT)
        with Locations((-57.5, 50)):
            Circle(F11_R_4, mode=Mode.SUBTRACT)
        with Locations((-35.5, 50)):
            Circle(F11_R_4, mode=Mode.SUBTRACT)
        with Locations((-13.5, 50)):
            Circle(F11_R_4, mode=Mode.SUBTRACT)
        with Locations((-123.5, 80)):
            Circle(F11_R_4, mode=Mode.SUBTRACT)
        with Locations((-123.8082945347, 95)):
            Circle(F11_R_3, mode=Mode.SUBTRACT)
        with Locations((-101.5, 80)):
            Circle(F11_R_4, mode=Mode.SUBTRACT)
        with Locations((-79.5, 80)):
            Circle(F11_R_4, mode=Mode.SUBTRACT)
        with Locations((-101.8082945347, 95)):
            Circle(F11_R_3, mode=Mode.SUBTRACT)
        with Locations((-79.8082945347, 95)):
            Circle(F11_R_3, mode=Mode.SUBTRACT)
        with Locations((-123.5, 110)):
            Circle(F11_R_4, mode=Mode.SUBTRACT)
        with Locations((-101.5, 110)):
            Circle(F11_R_4, mode=Mode.SUBTRACT)
        with Locations((-79.5, 110)):
            Circle(F11_R_4, mode=Mode.SUBTRACT)
        with Locations((-57.5, 80)):
            Circle(F11_R_4, mode=Mode.SUBTRACT)
        with Locations((-57.8082945347, 95)):
            Circle(F11_R_3, mode=Mode.SUBTRACT)
        with Locations((-35.5, 80)):
            Circle(F11_R_4, mode=Mode.SUBTRACT)
        with Locations((-13.5, 80)):
            Circle(F11_R_4, mode=Mode.SUBTRACT)
        with Locations((-35.8082945347, 95)):
            Circle(F11_R_3, mode=Mode.SUBTRACT)
        with Locations((-13.8082945347, 95)):
            Circle(F11_R_3, mode=Mode.SUBTRACT)
        with Locations((-57.5, 110)):
            Circle(F11_R_4, mode=Mode.SUBTRACT)
        with Locations((-35.5, 110)):
            Circle(F11_R_4, mode=Mode.SUBTRACT)
        with Locations((-13.5, 110)):
            Circle(F11_R_4, mode=Mode.SUBTRACT)
        with Locations((12.5, 0)):
            Circle(F11_R_4, mode=Mode.SUBTRACT)
        with Locations((37.5, 0)):
            Circle(F11_R_4, mode=Mode.SUBTRACT)
        with Locations((8.5, 50)):
            Circle(F11_R_4, mode=Mode.SUBTRACT)
        with Locations((30.5, 50)):
            Circle(F11_R_4, mode=Mode.SUBTRACT)
        with Locations((52.5, 50)):
            Circle(F11_R_4, mode=Mode.SUBTRACT)
        with Locations((74.5, 50)):
            Circle(F11_R_4, mode=Mode.SUBTRACT)
        with Locations((96.5, 50)):
            Circle(F11_R_4, mode=Mode.SUBTRACT)
        with Locations((118.5, 50)):
            Circle(F11_R_4, mode=Mode.SUBTRACT)
        with Locations((8.5, 80)):
            Circle(F11_R_4, mode=Mode.SUBTRACT)
        with Locations((30.5, 80)):
            Circle(F11_R_4, mode=Mode.SUBTRACT)
        with Locations((8.1917054653, 95)):
            Circle(F11_R_3, mode=Mode.SUBTRACT)
        with Locations((30.1917054653, 95)):
            Circle(F11_R_3, mode=Mode.SUBTRACT)
        with Locations((52.5, 80)):
            Circle(F11_R_4, mode=Mode.SUBTRACT)
        with Locations((52.1917054653, 95)):
            Circle(F11_R_3, mode=Mode.SUBTRACT)
        with Locations((8.5, 110)):
            Circle(F11_R_4, mode=Mode.SUBTRACT)
        with Locations((30.5, 110)):
            Circle(F11_R_4, mode=Mode.SUBTRACT)
        with Locations((52.5, 110)):
            Circle(F11_R_4, mode=Mode.SUBTRACT)
        with Locations((74.5, 80)):
            Circle(F11_R_4, mode=Mode.SUBTRACT)
        with Locations((96.5, 80)):
            Circle(F11_R_4, mode=Mode.SUBTRACT)
        with Locations((74.1917054653, 95)):
            Circle(F11_R_3, mode=Mode.SUBTRACT)
        with Locations((96.1917054653, 95)):
            Circle(F11_R_3, mode=Mode.SUBTRACT)
        with Locations((118.5, 80)):
            Circle(F11_R_4, mode=Mode.SUBTRACT)
        with Locations((118.1917054653, 95)):
            Circle(F11_R_3, mode=Mode.SUBTRACT)
        with Locations((74.5, 110)):
            Circle(F11_R_4, mode=Mode.SUBTRACT)
        with Locations((96.5, 110)):
            Circle(F11_R_4, mode=Mode.SUBTRACT)
        with Locations((118.5, 110)):
            Circle(F11_R_4, mode=Mode.SUBTRACT)
    extrude(amount=-F12_DEPTH, mode=Mode.INTERSECT)


solid = f1.part
